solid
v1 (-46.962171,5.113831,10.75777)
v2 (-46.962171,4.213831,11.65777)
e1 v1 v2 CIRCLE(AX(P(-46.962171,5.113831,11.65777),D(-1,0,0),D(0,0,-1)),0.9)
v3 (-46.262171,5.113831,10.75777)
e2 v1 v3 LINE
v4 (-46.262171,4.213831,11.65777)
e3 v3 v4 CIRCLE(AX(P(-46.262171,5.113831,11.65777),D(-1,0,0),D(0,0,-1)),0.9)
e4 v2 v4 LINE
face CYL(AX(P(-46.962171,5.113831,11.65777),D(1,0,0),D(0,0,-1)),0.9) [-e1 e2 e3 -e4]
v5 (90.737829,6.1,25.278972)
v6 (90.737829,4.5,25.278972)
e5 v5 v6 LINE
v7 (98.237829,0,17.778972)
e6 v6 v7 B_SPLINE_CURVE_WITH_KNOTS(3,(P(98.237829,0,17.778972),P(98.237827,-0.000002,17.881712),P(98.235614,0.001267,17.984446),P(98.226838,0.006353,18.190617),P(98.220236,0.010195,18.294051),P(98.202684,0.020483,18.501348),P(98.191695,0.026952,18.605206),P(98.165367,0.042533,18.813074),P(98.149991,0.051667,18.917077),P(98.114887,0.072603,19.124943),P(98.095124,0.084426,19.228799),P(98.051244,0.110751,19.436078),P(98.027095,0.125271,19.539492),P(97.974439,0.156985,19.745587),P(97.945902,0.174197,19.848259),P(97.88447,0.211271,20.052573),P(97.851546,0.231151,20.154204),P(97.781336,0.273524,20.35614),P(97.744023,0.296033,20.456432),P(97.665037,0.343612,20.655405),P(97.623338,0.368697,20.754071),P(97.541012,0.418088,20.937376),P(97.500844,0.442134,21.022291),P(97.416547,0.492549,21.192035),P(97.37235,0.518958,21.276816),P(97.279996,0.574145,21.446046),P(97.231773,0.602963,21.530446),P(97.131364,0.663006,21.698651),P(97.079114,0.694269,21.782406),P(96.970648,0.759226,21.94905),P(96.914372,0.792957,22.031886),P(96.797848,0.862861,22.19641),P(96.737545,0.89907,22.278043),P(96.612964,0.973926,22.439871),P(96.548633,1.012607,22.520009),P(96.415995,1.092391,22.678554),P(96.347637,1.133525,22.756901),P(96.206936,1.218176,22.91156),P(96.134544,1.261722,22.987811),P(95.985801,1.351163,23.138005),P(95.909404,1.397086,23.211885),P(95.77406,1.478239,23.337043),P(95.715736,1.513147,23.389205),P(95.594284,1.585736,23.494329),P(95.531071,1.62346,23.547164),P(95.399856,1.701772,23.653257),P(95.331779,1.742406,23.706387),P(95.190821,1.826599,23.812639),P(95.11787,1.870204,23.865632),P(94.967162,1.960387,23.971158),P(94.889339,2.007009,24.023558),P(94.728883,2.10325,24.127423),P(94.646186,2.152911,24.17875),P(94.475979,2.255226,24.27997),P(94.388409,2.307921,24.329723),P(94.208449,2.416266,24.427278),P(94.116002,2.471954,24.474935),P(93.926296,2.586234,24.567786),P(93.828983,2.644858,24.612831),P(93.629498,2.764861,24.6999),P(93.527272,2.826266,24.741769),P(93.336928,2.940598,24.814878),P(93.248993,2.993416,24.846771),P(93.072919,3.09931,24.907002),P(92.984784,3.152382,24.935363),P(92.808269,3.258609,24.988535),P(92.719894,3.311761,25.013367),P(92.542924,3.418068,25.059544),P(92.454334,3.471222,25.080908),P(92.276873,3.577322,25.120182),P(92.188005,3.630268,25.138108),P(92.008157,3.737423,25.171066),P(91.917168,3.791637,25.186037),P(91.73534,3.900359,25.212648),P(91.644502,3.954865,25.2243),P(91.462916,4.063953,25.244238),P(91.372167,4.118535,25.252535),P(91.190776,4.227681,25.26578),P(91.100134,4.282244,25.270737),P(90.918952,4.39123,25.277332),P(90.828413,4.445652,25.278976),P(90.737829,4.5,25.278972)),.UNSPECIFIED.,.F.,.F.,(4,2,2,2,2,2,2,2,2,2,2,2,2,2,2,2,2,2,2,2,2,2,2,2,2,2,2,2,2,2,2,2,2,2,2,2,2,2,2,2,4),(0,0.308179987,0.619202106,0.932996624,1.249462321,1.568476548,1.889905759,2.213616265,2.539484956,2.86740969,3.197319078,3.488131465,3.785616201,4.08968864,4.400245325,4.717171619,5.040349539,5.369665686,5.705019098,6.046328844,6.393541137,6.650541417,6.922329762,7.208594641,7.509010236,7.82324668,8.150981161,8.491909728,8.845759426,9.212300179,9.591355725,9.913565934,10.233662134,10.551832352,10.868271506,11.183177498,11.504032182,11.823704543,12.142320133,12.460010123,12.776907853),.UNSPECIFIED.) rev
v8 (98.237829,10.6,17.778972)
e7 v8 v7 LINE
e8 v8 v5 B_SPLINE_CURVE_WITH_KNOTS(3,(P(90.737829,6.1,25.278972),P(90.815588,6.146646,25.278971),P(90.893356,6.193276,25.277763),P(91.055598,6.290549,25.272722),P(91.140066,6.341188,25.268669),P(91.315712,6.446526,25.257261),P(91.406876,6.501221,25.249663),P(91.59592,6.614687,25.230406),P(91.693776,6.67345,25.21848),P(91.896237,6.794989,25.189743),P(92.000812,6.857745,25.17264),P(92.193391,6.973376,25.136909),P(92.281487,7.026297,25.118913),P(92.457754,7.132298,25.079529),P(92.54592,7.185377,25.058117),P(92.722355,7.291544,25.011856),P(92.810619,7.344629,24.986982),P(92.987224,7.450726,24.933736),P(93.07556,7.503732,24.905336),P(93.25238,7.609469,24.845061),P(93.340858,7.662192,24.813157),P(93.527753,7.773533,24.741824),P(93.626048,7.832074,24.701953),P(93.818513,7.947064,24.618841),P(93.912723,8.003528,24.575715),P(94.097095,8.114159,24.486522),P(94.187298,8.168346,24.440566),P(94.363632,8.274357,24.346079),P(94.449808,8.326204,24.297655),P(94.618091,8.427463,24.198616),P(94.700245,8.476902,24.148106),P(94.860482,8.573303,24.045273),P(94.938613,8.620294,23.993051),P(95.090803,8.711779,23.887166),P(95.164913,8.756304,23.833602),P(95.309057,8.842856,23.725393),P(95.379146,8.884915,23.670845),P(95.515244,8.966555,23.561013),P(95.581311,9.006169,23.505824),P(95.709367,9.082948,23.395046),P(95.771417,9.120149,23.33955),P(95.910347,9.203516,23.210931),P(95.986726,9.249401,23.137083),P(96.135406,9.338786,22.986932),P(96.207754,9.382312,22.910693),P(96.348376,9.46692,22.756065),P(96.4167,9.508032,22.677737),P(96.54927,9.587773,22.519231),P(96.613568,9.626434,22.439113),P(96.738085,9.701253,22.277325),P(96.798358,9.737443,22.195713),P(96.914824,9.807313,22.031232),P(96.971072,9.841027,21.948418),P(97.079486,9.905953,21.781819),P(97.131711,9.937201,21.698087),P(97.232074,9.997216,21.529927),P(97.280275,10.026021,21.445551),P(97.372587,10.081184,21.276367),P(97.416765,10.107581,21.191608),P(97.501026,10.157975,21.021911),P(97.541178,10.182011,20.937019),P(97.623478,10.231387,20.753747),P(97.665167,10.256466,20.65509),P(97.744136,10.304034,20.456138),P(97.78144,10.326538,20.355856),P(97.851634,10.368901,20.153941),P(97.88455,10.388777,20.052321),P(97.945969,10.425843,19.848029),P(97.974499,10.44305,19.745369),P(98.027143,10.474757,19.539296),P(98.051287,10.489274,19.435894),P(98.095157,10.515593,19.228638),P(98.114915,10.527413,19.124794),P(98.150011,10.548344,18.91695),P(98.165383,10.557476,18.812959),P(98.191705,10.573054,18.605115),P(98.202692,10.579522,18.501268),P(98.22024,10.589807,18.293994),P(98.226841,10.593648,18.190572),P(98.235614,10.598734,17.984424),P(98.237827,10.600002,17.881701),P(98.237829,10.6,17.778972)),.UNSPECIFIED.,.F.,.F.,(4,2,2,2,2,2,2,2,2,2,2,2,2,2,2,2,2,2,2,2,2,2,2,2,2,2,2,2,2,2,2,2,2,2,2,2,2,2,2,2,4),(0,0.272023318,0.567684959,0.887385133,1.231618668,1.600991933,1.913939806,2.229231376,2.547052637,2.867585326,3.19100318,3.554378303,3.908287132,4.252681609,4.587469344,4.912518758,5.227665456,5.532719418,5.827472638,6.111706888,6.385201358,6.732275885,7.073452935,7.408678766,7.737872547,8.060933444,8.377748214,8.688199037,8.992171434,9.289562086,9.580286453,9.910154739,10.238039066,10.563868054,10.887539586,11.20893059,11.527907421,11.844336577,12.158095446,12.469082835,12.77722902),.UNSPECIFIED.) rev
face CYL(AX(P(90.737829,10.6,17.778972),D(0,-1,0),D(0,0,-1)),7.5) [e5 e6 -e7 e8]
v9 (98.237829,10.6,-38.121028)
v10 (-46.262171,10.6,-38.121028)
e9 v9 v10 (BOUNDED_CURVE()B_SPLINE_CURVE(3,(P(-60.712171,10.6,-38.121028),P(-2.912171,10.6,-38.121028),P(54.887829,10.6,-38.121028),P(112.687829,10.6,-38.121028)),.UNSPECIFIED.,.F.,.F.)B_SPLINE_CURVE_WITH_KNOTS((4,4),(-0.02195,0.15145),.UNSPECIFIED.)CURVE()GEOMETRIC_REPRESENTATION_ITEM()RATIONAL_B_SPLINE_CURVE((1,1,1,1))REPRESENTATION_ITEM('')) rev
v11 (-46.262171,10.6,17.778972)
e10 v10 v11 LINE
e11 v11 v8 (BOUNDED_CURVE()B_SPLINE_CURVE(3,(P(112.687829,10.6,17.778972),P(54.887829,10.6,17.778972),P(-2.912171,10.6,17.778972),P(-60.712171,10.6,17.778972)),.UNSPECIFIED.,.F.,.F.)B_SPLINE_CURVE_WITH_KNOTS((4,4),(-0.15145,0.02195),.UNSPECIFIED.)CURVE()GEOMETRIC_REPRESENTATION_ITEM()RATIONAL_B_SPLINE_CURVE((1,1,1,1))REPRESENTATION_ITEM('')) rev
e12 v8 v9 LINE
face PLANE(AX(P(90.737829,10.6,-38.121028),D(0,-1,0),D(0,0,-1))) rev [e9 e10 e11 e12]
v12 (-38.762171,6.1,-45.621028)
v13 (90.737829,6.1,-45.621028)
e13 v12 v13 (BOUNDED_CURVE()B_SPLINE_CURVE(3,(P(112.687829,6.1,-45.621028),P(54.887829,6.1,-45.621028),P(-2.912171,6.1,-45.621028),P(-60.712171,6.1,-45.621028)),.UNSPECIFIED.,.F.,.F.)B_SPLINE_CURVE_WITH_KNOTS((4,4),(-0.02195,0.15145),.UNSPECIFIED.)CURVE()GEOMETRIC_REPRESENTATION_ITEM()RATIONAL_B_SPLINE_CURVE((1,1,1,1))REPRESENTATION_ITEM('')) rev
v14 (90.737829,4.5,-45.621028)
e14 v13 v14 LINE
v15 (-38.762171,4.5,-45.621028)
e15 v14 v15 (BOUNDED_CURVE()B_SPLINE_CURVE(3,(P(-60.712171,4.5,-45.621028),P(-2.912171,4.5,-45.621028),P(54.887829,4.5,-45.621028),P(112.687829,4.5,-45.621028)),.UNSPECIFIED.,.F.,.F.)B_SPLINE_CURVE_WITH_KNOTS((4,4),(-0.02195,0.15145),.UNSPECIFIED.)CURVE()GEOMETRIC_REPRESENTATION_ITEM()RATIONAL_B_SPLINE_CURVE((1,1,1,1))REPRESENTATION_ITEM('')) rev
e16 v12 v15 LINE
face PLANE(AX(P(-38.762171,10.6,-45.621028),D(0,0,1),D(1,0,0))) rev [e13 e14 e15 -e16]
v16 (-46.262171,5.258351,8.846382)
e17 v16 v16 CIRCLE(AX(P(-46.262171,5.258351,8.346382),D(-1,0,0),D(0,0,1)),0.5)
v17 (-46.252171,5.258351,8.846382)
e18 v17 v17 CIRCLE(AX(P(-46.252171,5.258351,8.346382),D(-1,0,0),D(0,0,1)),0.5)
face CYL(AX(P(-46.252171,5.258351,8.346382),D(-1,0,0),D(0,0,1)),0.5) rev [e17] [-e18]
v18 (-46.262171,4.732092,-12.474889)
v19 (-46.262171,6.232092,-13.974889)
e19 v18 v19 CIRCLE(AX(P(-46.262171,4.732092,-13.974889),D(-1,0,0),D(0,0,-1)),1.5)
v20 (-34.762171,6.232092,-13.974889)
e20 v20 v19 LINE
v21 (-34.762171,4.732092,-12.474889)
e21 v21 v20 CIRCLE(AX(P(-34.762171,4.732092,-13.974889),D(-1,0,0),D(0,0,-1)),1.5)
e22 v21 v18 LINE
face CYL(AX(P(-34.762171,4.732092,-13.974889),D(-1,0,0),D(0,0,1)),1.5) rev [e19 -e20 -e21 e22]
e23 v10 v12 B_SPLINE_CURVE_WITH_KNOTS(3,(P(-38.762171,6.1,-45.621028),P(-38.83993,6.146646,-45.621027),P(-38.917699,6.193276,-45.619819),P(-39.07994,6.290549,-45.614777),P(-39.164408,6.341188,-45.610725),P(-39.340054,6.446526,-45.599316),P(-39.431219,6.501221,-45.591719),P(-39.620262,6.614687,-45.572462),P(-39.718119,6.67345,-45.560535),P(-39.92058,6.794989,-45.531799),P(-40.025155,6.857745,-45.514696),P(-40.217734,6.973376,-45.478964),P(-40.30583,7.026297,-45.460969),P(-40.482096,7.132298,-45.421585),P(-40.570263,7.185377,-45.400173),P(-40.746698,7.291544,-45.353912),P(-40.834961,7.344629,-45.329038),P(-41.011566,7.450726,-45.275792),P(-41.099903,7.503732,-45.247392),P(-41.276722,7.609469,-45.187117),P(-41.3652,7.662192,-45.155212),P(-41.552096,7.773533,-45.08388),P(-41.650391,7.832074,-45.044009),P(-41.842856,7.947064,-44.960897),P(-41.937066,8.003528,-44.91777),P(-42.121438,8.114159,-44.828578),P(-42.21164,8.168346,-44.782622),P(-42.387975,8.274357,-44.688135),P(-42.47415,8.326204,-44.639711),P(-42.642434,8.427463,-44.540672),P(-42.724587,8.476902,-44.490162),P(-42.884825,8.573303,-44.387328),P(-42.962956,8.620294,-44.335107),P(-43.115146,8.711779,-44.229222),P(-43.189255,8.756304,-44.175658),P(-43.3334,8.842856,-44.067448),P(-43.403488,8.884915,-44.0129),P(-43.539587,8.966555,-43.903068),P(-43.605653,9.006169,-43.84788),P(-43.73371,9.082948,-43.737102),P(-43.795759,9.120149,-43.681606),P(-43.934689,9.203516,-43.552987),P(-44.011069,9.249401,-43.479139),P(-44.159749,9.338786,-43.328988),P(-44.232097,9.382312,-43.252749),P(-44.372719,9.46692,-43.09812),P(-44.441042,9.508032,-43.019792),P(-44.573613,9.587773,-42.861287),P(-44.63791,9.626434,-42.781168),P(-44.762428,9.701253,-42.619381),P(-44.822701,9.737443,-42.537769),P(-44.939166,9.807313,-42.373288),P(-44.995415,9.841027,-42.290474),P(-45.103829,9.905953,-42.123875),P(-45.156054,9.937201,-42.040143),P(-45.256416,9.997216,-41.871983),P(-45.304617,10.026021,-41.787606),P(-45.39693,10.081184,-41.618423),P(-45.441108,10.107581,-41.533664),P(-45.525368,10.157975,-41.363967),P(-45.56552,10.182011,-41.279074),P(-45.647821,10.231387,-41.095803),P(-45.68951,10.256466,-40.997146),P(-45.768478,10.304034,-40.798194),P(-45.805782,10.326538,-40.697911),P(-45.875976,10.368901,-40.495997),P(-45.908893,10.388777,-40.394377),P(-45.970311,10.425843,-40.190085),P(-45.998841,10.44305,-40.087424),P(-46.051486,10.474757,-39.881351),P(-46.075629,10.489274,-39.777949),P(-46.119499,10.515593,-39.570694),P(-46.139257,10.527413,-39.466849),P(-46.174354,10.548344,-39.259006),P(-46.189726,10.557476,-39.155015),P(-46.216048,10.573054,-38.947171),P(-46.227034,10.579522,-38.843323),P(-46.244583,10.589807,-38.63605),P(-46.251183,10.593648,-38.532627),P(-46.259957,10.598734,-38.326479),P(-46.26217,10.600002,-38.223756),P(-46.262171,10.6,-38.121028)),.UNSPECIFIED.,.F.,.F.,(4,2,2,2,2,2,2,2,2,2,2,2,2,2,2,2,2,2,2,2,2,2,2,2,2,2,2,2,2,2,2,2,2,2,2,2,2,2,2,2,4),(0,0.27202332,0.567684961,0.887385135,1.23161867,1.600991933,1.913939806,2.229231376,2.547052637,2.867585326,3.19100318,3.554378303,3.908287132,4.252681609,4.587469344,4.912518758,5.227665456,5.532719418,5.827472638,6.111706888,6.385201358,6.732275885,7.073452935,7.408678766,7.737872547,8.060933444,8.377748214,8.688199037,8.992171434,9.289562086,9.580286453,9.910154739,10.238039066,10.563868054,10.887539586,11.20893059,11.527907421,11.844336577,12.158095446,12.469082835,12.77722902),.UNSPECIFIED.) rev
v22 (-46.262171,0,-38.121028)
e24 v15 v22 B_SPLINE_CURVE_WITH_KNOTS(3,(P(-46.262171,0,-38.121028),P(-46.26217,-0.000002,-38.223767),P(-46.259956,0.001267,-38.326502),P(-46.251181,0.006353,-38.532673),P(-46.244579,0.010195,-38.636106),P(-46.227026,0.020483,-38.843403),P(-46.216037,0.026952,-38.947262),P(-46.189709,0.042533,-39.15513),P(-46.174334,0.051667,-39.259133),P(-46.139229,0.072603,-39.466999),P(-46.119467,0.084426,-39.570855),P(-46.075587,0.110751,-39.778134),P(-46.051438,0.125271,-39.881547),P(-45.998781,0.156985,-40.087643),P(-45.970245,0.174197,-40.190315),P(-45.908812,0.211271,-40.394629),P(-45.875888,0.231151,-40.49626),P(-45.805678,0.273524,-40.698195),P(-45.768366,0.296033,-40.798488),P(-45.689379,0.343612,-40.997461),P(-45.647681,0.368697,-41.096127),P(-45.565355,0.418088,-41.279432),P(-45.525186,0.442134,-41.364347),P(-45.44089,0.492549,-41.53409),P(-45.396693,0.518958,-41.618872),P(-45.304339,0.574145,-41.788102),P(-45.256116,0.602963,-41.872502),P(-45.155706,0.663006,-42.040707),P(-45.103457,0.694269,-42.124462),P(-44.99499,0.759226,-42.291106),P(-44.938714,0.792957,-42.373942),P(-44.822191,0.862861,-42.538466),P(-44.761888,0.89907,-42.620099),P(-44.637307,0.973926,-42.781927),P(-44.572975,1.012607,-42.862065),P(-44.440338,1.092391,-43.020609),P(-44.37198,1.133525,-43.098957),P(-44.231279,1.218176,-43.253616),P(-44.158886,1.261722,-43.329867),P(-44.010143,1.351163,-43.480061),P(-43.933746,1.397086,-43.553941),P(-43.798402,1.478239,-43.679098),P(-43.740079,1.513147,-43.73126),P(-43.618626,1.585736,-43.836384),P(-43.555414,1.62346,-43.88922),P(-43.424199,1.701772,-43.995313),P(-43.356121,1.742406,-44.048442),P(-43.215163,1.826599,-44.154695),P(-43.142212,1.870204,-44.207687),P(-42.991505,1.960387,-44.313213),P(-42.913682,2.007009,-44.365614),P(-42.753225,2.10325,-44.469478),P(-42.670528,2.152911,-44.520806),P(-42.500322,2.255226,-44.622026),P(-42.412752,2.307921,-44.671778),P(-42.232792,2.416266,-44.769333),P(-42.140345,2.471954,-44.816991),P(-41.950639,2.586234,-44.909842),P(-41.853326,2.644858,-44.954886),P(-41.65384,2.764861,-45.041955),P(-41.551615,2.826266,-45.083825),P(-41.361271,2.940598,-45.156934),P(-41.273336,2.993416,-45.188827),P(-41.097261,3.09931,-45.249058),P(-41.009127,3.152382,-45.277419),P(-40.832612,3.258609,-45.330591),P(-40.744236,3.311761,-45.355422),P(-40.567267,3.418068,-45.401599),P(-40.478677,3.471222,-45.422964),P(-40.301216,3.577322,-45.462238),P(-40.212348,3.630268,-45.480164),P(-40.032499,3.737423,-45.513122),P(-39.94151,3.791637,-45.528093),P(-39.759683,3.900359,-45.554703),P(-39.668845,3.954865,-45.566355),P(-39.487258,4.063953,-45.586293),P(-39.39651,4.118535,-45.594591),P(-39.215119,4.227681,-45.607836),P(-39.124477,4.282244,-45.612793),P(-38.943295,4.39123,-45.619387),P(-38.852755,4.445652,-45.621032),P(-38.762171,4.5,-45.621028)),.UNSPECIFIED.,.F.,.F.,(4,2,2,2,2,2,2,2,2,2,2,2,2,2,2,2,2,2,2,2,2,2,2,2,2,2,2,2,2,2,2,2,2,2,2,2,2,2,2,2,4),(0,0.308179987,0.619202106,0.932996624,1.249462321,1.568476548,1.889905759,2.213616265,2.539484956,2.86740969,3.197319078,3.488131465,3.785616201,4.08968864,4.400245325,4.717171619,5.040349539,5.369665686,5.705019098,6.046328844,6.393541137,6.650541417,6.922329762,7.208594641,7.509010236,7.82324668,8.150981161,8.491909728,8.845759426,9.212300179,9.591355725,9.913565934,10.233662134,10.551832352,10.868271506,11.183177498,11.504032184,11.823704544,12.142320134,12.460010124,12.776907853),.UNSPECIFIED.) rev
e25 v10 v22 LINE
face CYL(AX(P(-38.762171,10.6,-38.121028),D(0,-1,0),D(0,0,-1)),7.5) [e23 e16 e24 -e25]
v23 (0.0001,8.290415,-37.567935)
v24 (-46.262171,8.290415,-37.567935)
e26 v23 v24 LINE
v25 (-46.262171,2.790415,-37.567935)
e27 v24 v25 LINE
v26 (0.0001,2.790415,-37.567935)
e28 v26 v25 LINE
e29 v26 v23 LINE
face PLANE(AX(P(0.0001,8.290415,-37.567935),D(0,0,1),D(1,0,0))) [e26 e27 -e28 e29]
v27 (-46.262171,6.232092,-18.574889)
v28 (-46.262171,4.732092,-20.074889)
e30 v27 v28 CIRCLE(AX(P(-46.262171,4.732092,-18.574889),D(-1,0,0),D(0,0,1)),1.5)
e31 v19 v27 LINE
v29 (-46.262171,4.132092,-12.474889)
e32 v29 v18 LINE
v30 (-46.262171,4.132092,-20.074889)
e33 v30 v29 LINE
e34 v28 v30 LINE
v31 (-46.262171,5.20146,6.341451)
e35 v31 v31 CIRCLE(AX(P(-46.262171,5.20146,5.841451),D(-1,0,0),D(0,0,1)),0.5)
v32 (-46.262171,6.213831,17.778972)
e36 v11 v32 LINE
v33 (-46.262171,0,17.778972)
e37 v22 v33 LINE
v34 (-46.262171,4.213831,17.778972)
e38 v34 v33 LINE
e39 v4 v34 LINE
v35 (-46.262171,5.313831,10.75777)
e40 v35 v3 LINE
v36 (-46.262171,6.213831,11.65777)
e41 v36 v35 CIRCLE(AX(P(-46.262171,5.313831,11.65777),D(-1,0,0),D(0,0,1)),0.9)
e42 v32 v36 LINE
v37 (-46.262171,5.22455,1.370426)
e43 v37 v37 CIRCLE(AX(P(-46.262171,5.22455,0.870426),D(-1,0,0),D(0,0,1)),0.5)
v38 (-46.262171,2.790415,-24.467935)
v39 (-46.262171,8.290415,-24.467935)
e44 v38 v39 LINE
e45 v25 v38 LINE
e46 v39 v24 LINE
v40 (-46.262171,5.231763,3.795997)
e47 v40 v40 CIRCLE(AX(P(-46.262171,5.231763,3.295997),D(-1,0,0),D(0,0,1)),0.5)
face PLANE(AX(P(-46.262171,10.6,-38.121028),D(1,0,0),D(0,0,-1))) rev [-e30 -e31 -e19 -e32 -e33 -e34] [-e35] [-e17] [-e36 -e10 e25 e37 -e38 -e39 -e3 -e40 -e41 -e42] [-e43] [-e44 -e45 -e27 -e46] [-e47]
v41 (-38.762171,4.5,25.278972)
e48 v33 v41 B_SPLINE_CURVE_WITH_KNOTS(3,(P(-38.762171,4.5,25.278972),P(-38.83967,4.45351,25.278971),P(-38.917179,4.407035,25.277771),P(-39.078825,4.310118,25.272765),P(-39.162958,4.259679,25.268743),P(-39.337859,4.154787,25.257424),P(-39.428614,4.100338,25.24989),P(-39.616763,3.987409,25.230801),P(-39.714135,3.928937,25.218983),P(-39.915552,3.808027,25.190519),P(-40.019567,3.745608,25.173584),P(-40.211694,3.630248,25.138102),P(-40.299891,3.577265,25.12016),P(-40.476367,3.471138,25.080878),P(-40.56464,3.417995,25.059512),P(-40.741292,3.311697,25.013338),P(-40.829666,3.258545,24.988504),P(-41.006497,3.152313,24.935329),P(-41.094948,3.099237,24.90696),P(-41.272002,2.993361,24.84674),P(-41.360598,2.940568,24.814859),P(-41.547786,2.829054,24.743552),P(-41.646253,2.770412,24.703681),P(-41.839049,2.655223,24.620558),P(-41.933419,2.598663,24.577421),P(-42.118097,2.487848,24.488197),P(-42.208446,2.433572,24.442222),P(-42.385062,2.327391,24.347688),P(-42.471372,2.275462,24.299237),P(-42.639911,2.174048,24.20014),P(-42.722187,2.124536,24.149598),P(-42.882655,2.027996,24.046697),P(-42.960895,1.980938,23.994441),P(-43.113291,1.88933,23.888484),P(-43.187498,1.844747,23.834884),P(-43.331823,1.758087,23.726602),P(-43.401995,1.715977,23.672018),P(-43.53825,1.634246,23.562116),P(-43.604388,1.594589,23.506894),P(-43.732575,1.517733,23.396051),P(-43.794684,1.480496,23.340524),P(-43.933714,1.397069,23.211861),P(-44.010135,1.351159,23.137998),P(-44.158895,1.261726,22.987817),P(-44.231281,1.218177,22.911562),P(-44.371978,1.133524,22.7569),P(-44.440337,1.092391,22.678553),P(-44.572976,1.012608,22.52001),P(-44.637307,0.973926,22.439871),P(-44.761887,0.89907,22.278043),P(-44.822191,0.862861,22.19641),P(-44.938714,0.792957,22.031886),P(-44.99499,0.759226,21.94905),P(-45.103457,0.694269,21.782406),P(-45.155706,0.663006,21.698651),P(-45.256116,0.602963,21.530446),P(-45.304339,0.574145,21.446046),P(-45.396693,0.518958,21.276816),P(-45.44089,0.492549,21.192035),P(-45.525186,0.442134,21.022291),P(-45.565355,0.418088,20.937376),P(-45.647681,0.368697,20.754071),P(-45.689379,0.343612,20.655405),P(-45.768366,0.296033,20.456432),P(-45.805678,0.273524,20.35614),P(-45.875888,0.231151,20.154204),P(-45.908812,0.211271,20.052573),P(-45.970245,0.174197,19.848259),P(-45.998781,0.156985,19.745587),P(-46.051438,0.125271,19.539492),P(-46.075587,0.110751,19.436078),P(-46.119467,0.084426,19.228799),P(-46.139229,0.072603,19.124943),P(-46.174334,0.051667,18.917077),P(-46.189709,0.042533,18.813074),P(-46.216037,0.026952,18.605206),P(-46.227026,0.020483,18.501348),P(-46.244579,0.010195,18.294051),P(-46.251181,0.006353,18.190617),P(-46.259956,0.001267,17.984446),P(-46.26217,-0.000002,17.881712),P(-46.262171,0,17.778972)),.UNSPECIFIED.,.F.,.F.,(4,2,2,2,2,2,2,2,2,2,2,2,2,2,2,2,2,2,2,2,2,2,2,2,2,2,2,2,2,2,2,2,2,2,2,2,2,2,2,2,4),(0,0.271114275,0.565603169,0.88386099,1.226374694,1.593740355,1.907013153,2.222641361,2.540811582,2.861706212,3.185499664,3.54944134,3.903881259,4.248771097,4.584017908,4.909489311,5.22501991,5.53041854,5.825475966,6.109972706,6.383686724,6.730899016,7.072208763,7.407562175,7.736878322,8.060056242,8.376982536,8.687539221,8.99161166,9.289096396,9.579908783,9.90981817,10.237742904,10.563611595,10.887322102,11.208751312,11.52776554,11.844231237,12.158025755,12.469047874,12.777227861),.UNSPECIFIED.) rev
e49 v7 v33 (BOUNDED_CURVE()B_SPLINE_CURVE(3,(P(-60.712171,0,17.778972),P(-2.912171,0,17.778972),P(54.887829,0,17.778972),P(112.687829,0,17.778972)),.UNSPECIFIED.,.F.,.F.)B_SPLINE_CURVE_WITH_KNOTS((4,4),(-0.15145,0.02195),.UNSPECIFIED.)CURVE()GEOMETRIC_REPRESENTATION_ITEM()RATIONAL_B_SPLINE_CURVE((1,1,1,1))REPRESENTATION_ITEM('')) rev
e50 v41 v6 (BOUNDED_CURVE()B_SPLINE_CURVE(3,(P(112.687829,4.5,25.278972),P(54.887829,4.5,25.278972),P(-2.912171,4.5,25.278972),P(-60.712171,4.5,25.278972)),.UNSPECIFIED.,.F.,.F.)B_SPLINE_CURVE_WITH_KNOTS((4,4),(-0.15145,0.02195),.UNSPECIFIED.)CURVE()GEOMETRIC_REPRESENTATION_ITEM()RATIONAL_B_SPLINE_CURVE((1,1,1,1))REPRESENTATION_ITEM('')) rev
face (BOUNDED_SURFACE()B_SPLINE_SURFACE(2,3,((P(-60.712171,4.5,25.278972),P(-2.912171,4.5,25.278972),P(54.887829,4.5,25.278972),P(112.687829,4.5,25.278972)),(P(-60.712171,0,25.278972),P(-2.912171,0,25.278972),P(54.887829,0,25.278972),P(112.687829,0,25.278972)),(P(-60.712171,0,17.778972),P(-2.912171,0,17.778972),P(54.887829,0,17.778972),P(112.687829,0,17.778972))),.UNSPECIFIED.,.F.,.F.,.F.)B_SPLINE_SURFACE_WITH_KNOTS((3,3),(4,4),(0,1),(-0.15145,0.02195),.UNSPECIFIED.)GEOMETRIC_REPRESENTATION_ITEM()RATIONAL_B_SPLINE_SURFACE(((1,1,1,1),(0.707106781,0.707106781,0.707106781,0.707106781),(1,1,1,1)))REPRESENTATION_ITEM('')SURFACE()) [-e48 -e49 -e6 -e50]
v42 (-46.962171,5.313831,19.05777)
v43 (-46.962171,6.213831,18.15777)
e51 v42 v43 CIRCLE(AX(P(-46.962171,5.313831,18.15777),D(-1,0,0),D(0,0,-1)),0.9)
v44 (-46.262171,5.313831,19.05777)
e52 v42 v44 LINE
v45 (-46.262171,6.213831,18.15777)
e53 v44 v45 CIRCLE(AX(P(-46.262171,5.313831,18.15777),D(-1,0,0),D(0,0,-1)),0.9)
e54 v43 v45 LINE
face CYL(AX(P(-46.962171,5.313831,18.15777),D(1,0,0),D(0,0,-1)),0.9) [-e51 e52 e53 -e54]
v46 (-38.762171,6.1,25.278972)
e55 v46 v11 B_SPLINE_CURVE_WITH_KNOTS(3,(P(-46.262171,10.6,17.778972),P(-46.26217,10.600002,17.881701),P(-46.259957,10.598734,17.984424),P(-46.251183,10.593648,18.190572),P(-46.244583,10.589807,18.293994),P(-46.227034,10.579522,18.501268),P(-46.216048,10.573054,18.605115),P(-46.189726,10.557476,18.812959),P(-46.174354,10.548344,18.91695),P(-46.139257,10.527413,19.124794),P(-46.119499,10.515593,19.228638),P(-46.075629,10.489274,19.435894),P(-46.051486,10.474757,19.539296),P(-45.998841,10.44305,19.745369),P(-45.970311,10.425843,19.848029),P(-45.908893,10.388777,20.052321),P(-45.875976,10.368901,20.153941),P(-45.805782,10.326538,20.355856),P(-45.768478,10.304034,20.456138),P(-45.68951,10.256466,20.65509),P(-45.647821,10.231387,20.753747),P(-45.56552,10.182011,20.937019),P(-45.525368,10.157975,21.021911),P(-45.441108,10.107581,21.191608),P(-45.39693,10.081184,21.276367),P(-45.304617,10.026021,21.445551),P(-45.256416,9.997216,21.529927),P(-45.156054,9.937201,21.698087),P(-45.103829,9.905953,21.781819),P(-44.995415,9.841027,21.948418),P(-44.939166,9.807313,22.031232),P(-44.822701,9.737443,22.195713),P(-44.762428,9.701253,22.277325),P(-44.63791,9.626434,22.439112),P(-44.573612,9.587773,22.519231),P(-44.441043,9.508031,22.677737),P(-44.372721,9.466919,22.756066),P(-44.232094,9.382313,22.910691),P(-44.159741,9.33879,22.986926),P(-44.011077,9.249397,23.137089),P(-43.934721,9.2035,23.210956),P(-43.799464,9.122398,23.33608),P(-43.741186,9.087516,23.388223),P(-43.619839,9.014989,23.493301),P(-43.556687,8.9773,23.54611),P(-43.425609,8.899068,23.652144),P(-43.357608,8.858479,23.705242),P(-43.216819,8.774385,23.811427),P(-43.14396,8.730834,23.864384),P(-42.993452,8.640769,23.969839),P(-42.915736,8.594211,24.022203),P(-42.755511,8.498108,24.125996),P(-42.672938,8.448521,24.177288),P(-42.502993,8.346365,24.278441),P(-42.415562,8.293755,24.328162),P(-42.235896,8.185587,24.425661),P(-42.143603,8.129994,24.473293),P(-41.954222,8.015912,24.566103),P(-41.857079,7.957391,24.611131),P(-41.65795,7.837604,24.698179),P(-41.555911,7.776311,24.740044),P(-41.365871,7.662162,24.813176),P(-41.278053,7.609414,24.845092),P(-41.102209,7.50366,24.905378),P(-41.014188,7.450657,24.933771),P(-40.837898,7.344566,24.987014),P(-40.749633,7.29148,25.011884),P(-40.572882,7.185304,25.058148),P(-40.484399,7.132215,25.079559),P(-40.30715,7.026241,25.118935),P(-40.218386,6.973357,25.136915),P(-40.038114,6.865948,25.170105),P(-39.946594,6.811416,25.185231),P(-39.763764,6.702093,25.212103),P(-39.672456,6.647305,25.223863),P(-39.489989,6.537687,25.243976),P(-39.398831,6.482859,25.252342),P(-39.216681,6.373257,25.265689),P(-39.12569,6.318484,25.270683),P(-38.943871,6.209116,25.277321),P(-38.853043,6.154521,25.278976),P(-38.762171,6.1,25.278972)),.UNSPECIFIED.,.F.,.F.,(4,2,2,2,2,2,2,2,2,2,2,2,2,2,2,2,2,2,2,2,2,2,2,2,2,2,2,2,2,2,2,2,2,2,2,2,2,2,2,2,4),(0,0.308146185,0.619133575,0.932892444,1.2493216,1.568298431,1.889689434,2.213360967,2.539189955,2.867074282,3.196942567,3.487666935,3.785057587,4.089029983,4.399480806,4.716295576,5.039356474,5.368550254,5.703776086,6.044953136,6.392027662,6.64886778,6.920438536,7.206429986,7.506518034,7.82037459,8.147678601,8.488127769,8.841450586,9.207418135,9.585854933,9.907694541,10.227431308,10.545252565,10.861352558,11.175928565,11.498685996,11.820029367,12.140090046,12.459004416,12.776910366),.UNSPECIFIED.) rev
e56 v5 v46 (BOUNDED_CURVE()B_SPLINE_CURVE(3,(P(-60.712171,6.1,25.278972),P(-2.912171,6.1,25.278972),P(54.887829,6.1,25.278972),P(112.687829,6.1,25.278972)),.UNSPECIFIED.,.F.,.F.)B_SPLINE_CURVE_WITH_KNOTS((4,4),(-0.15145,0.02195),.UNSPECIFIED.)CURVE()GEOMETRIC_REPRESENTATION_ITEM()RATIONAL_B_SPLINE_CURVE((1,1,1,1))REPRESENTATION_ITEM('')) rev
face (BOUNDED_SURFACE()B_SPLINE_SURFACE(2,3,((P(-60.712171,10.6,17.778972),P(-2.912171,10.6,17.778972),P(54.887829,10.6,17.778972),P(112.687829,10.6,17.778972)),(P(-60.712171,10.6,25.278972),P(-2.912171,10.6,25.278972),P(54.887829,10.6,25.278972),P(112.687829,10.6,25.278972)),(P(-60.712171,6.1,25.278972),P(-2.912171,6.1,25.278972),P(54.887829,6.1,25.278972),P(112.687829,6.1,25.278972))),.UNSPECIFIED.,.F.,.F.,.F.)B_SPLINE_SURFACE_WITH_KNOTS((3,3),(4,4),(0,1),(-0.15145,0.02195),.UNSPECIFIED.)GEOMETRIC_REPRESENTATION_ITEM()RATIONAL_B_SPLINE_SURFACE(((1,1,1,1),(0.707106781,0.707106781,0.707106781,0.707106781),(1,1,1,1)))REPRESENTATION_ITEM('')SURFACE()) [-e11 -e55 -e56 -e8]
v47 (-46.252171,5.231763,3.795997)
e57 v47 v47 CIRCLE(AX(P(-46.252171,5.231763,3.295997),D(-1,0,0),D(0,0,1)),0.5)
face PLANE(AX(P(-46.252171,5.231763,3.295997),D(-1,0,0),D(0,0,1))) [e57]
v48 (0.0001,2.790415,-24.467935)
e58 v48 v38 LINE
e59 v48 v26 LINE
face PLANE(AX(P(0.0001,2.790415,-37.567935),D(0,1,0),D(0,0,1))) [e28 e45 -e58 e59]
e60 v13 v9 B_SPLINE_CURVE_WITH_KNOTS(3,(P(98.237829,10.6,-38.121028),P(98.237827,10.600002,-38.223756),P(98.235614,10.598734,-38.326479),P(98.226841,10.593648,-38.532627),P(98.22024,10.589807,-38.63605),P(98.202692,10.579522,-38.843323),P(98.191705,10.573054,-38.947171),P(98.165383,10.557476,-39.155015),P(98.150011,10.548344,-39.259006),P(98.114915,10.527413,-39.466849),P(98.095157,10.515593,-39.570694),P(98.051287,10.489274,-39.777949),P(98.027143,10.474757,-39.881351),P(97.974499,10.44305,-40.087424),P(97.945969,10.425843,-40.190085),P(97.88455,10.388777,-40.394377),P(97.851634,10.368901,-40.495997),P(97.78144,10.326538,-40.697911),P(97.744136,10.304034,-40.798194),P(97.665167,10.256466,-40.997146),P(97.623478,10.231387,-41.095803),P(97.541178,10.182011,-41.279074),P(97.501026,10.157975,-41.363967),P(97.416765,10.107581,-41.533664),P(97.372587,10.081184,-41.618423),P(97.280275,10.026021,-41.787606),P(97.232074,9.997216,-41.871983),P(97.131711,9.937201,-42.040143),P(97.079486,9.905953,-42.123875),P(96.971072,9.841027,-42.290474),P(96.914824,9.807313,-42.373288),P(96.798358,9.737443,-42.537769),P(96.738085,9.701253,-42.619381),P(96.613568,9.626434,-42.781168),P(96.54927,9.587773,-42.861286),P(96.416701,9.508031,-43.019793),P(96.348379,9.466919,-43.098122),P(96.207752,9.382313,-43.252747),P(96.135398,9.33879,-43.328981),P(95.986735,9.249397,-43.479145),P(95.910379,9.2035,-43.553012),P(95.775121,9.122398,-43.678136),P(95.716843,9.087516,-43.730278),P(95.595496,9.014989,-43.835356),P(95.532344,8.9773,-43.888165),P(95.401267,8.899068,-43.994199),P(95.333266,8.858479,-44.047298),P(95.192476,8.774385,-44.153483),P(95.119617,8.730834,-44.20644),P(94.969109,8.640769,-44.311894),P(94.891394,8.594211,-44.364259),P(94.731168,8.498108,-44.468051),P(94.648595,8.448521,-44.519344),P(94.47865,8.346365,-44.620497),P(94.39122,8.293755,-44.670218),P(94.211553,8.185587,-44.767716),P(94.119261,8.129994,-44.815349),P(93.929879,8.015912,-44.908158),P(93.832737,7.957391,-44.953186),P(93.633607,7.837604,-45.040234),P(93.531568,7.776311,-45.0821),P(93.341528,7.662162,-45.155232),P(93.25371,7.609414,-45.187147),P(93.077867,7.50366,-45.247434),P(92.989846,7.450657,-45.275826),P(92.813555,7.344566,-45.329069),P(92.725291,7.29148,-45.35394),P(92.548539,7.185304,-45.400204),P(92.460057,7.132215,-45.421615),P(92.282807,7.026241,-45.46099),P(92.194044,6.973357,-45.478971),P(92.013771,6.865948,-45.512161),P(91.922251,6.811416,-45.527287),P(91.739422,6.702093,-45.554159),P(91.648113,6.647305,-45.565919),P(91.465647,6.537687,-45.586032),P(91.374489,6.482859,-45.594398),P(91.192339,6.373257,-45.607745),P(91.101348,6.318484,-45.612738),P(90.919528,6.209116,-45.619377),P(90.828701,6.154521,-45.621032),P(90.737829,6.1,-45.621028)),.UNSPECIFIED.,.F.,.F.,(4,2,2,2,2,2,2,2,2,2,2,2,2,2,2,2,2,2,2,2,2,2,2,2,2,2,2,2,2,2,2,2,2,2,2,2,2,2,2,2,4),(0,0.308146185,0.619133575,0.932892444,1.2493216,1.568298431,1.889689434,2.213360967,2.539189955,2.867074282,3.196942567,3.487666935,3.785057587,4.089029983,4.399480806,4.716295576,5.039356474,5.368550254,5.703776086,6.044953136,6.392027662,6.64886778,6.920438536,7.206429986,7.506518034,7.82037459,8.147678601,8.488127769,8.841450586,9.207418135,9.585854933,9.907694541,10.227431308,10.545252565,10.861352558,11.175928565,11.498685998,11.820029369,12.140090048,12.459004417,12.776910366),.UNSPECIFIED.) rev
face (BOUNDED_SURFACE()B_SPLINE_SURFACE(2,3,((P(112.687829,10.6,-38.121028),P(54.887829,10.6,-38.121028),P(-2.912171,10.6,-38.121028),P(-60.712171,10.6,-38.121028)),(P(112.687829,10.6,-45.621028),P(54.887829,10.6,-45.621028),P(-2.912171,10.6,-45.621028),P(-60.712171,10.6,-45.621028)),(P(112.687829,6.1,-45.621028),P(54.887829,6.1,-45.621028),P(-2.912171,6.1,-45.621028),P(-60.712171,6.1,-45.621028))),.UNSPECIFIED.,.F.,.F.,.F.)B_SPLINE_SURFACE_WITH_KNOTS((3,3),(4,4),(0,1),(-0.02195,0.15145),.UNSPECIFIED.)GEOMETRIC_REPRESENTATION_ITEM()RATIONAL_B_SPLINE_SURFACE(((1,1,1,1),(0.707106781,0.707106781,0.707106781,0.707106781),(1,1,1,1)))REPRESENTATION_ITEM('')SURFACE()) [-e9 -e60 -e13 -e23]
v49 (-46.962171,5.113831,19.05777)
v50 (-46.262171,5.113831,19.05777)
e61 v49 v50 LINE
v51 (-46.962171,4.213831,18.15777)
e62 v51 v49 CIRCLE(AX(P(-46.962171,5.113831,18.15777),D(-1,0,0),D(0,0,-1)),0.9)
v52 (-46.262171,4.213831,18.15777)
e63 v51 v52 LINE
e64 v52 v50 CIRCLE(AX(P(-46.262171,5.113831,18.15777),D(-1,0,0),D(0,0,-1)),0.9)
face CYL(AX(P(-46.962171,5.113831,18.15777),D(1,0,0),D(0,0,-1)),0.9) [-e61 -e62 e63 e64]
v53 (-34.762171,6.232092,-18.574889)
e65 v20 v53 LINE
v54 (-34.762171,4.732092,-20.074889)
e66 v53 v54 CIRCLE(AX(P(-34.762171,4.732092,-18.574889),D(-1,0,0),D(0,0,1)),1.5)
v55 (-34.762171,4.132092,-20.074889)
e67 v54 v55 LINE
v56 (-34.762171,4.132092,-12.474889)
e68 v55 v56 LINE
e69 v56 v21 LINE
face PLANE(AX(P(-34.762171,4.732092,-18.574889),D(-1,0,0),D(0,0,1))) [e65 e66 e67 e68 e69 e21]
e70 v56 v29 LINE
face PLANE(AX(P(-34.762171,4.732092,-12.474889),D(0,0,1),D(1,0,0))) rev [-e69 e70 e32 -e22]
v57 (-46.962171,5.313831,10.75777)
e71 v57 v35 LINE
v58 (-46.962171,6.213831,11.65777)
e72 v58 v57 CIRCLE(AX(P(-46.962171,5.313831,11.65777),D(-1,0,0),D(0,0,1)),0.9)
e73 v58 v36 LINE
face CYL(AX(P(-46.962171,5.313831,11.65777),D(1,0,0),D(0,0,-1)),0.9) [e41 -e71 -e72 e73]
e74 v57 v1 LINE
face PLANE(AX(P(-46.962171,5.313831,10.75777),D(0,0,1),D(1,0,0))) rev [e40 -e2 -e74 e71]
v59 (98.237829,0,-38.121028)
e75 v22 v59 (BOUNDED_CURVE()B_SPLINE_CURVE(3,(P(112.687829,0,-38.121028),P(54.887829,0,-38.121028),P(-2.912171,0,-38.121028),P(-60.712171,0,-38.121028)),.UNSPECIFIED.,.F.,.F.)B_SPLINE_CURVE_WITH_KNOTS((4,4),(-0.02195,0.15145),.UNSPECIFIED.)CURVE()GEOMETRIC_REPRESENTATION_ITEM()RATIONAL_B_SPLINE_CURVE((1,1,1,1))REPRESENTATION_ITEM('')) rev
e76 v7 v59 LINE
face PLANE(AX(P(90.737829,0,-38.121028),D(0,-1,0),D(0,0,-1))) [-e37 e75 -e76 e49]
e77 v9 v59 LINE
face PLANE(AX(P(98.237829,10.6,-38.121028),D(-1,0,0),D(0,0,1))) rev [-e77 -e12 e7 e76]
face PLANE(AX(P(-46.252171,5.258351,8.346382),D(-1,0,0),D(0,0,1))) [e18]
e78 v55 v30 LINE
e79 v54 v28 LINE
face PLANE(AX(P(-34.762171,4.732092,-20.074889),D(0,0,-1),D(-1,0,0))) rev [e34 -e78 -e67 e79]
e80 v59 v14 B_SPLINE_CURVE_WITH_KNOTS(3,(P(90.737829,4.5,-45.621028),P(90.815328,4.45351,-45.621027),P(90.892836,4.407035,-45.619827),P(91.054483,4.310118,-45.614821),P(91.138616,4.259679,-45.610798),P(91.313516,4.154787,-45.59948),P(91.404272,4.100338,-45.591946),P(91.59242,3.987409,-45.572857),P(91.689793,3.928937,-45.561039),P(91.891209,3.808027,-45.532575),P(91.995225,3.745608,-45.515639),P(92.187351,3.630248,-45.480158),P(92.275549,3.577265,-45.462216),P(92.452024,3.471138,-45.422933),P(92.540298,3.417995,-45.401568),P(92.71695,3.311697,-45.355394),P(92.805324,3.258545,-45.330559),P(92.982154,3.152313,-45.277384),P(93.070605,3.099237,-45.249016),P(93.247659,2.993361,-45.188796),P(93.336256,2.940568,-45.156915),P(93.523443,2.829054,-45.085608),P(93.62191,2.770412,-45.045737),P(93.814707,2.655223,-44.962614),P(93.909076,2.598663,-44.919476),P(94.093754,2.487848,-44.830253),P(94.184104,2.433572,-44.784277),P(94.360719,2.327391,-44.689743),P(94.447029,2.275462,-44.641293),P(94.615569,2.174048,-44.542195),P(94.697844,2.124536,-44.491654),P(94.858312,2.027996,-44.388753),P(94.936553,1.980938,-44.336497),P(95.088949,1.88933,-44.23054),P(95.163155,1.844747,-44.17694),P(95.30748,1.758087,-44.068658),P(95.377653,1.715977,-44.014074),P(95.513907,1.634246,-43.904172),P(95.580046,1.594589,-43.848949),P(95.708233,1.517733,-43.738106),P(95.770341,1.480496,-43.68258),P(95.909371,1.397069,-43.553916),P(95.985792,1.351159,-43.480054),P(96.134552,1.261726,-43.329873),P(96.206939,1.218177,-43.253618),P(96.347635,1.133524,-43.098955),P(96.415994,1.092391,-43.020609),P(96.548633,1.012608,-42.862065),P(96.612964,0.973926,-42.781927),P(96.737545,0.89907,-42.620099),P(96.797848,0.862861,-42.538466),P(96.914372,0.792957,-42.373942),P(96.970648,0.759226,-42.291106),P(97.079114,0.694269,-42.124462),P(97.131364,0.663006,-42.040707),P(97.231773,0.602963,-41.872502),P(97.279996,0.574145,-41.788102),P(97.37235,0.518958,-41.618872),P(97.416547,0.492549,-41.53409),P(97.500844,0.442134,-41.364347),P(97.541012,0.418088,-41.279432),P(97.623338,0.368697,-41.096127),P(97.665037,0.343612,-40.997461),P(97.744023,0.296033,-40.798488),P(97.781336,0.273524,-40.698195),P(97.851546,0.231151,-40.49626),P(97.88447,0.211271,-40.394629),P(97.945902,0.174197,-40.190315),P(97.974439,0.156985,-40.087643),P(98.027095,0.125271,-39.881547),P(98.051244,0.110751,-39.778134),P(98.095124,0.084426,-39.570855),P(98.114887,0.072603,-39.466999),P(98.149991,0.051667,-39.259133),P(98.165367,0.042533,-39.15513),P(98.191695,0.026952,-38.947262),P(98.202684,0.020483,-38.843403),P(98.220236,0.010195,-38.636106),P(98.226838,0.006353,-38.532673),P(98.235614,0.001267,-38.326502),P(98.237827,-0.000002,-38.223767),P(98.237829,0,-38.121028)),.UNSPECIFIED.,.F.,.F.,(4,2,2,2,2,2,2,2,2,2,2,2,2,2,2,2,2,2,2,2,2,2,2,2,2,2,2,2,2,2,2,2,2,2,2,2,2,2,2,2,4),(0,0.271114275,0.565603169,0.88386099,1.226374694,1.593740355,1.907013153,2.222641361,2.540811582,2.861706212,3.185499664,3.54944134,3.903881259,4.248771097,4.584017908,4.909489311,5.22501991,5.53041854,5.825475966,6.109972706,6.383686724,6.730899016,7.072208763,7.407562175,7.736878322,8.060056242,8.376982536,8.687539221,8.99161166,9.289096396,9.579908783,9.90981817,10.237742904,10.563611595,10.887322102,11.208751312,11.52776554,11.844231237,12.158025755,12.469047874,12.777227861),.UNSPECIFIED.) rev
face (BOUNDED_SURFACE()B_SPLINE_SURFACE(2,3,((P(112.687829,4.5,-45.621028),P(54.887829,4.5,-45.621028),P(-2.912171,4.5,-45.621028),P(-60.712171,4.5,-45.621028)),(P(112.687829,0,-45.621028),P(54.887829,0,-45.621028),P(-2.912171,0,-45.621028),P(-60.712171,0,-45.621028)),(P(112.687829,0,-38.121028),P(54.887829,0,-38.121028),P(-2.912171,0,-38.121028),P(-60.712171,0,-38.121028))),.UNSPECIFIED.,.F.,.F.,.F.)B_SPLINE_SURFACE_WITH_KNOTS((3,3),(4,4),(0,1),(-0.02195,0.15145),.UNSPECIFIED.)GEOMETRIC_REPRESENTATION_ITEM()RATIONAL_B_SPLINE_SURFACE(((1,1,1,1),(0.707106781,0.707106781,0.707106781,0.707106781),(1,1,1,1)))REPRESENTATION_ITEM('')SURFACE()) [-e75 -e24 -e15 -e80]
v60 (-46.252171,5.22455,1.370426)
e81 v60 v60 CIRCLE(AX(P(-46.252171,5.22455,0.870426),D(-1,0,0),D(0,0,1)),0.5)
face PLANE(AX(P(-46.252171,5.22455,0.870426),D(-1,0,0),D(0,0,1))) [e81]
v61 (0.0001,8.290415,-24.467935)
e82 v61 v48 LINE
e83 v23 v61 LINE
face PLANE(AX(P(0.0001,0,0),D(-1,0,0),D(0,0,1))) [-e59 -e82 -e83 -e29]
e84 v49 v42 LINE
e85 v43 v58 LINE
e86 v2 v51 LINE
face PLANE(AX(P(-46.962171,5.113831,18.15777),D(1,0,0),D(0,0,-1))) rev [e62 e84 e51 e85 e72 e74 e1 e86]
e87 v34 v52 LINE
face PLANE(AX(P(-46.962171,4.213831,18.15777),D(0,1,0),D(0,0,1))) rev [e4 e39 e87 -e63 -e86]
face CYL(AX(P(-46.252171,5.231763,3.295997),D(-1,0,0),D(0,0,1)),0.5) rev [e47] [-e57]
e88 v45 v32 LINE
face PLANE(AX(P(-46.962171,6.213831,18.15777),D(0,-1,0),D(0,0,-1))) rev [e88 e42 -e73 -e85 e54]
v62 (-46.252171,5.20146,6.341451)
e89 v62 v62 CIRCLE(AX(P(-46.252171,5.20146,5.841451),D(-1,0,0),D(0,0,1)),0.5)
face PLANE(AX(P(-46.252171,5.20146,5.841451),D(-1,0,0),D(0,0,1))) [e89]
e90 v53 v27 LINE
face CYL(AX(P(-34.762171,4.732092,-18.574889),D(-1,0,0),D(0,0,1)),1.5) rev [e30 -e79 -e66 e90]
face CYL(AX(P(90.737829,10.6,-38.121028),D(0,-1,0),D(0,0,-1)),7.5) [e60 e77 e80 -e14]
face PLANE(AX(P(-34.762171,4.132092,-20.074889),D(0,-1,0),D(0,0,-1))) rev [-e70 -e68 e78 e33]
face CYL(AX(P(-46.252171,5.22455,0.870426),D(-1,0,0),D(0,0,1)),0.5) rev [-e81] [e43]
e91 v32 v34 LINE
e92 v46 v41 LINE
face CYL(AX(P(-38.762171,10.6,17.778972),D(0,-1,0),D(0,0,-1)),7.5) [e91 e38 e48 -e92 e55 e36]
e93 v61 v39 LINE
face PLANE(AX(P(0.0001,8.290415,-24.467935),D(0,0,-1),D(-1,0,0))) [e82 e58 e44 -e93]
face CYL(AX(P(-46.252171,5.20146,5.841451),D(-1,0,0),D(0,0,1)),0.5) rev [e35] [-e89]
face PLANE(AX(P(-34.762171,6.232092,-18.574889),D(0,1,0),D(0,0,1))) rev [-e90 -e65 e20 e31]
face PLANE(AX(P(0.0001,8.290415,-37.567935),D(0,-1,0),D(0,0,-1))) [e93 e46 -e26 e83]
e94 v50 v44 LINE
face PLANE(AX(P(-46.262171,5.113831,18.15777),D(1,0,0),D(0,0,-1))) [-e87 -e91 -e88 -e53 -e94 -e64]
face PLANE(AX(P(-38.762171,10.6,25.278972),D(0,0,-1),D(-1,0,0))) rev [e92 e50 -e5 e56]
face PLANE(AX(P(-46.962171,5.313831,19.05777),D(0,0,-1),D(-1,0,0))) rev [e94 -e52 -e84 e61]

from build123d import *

# Parameters (mm, degrees)
BOSS_EXTRUDE1_DEPTH     = 10.6
FILLET4_SIZE            = 4.5
FILLET4_SIZE_2          = 7.5
FILLET3_SIZE            = 7.5
FILLET3_SIZE_2          = 4.5
FILLET5_START           = -47
FILLET5_DEPTH           = 146
FILLET6_START           = -47
FILLET6_DEPTH           = 146
CUT_EXTRUDE1_DEPTH      = 0.0001
CUT_EXTRUDE1_DEPTH_BACK = 47.330240243
USB_OUTPUT_W            = 13.1
USB_OUTPUT_H            = 5.5
CUT_EXTRUDE2_DEPTH      = 11.5
BOSS_EXTRUDE2_DEPTH     = 0.7
SKETCH6_R               = 0.5
CUT_EXTRUDE3_DEPTH      = 0.01
SKETCH8_R               = 0.5
CUT_EXTRUDE4_DEPTH      = 0.01
SKETCH9_R               = 0.5
CUT_EXTRUDE5_DEPTH      = 0.01
SKETCH11_R              = 0.5
CUT_EXTRUDE7_DEPTH      = 0.01


with BuildPart() as part:
    # Sketch1 → Boss-Extrude1 (new body)
    with BuildSketch(Plane(origin=(0, 0, 0), x_dir=(1, 0, 0), z_dir=(0, 1, 0))):
        with BuildLine():
            Line((-38.762171266, 45.621027844), (90.737828734, 45.621027844))
            ThreePointArc((90.737828734, 45.621027844), (96.041129593, 43.424328703), (98.237828734, 38.121027844))
            Line((98.237828734, 38.121027844), (98.237828734, -17.778972156))
            ThreePointArc((98.237828734, -17.778972156), (96.041129593, -23.082273015), (90.737828734, -25.278972156))
            Line((90.737828734, -25.278972156), (-38.762171266, -25.278972156))
            ThreePointArc((-38.762171266, -25.278972156), (-44.065472124, -23.082273015), (-46.262171266, -17.778972156))
            Line((-46.262171266, -17.778972156), (-46.262171266, 38.121027844))
            ThreePointArc((-46.262171266, 38.121027844), (-44.065472124, 43.424328703), (-38.762171266, 45.621027844))
        make_face()
    extrude(amount=BOSS_EXTRUDE1_DEPTH)

    # Fillet4
    # a fillet whose section is not a circle: 7.5, 4.5 mm, written as the material it takes off along each edge
    with BuildSketch(Plane(origin=(109.487828734, 0, 25.278972156), x_dir=(0, 1, 0), z_dir=(-1, 0, 0))) as fillet4_piece_1:
        with BuildLine():
            Bezier((FILLET4_SIZE, 0), (0, 0), (0, FILLET4_SIZE_2), weights=[1, 0.707106781, 1])
            Line((0, FILLET4_SIZE_2), (0, 0))
            Line((0, 0), (FILLET4_SIZE, 0))
        make_face()
    extrude(amount=167, mode=Mode.SUBTRACT)

    # Fillet3
    # a fillet whose section is not a circle: 7.5, 4.5 mm, written as the material it takes off along each edge
    with BuildSketch(Plane(origin=(109.487828734, 10.6, 25.278972156), x_dir=(0, 0, -1), z_dir=(-1, 0, 0))) as fillet3_piece_1:
        with BuildLine():
            Bezier((FILLET3_SIZE, 0), (0, 0), (0, FILLET3_SIZE_2), weights=[1, 0.707106781, 1])
            Line((0, FILLET3_SIZE_2), (0, 0))
            Line((0, 0), (FILLET3_SIZE, 0))
        make_face()
    extrude(amount=167, mode=Mode.SUBTRACT)

    # Fillet5: read off the stored shape, not the designer's step
    # Fillet5 outline → Fillet5 (cut)
    with BuildSketch(Plane.YZ.offset(FILLET5_START)):
        with BuildLine():
            Line((10.6, -45.621027844), (10.6, -38.121027844))
            add(Edge.make_bspline(
                [(10.6, -38.121027844), (10.6, -45.621027844), (6.1, -45.621027844)],
                knots=[0, 0, 0, 1, 1, 1], degree=2, weights=[1, 0.707106781, 1]))
            Line((6.1, -45.621027844), (10.6, -45.621027844))
        make_face()
    extrude(amount=FILLET5_DEPTH, mode=Mode.SUBTRACT)

    # Fillet6: read off the stored shape, not the designer's step
    # Fillet6 outline → Fillet6 (cut)
    with BuildSketch(Plane.YZ.offset(FILLET6_START)):
        with BuildLine():
            Line((0, -45.621027844), (4.5, -45.621027844))
            add(Edge.make_bspline(
                [(4.5, -45.621027844), (0, -45.621027844), (0, -38.121027844)],
                knots=[0, 0, 0, 1, 1, 1], degree=2, weights=[1, 0.707106781, 1]))
            Line((0, -38.121027844), (0, -45.621027844))
        make_face()
    extrude(amount=FILLET6_DEPTH, mode=Mode.SUBTRACT)

    # USB Output → Cut-Extrude1 (cut, two sides: drawn at the far end of the back side and taken through both)
    with BuildSketch(Plane(origin=(0, 0, -28.925486843), x_dir=(0, 0, -1), z_dir=(1, 0, 0)).offset(-CUT_EXTRUDE1_DEPTH_BACK)):
        with Locations((2.092448173, 5.540415323)):
            Rectangle(USB_OUTPUT_W, USB_OUTPUT_H)
    extrude(amount=CUT_EXTRUDE1_DEPTH + CUT_EXTRUDE1_DEPTH_BACK, mode=Mode.SUBTRACT)

    # USB Charger → Cut-Extrude2 (cut)
    with BuildSketch(Plane.ZY.offset(46.262171266)):
        with BuildLine():
            Line((-18.574888724, 6.232091877), (-13.974888724, 6.232091877))
            ThreePointArc((-13.974888724, 6.232091877), (-12.914228552, 5.792752049), (-12.474888724, 4.732091877))
            Line((-12.474888724, 4.732091877), (-12.474888724, 4.132091877))
            Line((-12.474888724, 4.132091877), (-20.074888724, 4.132091877))
            Line((-20.074888724, 4.132091877), (-20.074888724, 4.732091877))
            ThreePointArc((-20.074888724, 4.732091877), (-19.635548896, 5.792752049), (-18.574888724, 6.232091877))
        make_face()
    extrude(amount=-CUT_EXTRUDE2_DEPTH, mode=Mode.SUBTRACT)

    # Sketch4 → Boss-Extrude2 (add)
    with BuildSketch(Plane.ZY.offset(46.262171266)):
        with BuildLine():
            Line((18.15777008, 6.213830992), (11.65777008, 6.213830992))
            ThreePointArc((11.65777008, 6.213830992), (11.021373976, 5.950227095), (10.75777008, 5.313830992))
            Line((10.75777008, 5.313830992), (10.75777008, 5.113830992))
            ThreePointArc((10.75777008, 5.113830992), (11.021373976, 4.477434889), (11.65777008, 4.213830992))
            Line((11.65777008, 4.213830992), (18.15777008, 4.213830992))
            ThreePointArc((18.15777008, 4.213830992), (18.794166183, 4.477434889), (19.05777008, 5.113830992))
            Line((19.05777008, 5.113830992), (19.05777008, 5.313830992))
            ThreePointArc((19.05777008, 5.313830992), (18.794166183, 5.950227095), (18.15777008, 6.213830992))
        make_face()
    extrude(amount=BOSS_EXTRUDE2_DEPTH)

    # Sketch6 → Cut-Extrude3 (cut)
    with BuildSketch(Plane(origin=(-46.262171266, 0, -7.484845673), x_dir=(0, 0, 1), z_dir=(-1, 0, 0))):
        with Locations((8.355271575, 5.224549503)):
            Circle(SKETCH6_R)
    extrude(amount=-CUT_EXTRUDE3_DEPTH, mode=Mode.SUBTRACT)

    # Sketch8 → Cut-Extrude4 (cut)
    with BuildSketch(Plane.ZY.offset(46.262171266)):
        with Locations((8.346381579, 5.258350764)):
            Circle(SKETCH8_R)
    extrude(amount=-CUT_EXTRUDE4_DEPTH, mode=Mode.SUBTRACT)

    # Sketch9 → Cut-Extrude5 (cut)
    with BuildSketch(Plane(origin=(-46.262171266, 1.999999249, 4.454543781), x_dir=(0, 0, 1), z_dir=(-1, 0, 0))):
        with Locations((1.386907241, 3.201460838)):
            Circle(SKETCH9_R)
    extrude(amount=-CUT_EXTRUDE5_DEPTH, mode=Mode.SUBTRACT)

    # Sketch11 → Cut-Extrude7 (cut)
    with BuildSketch(Plane(origin=(-46.262171266, 2.666665665, -5.363634349), x_dir=(0, 0, 1), z_dir=(-1, 0, 0))):
        with Locations((8.659631782, 2.56509744)):
            Circle(SKETCH11_R)
    extrude(amount=-CUT_EXTRUDE7_DEPTH, mode=Mode.SUBTRACT)


solid = part.part
